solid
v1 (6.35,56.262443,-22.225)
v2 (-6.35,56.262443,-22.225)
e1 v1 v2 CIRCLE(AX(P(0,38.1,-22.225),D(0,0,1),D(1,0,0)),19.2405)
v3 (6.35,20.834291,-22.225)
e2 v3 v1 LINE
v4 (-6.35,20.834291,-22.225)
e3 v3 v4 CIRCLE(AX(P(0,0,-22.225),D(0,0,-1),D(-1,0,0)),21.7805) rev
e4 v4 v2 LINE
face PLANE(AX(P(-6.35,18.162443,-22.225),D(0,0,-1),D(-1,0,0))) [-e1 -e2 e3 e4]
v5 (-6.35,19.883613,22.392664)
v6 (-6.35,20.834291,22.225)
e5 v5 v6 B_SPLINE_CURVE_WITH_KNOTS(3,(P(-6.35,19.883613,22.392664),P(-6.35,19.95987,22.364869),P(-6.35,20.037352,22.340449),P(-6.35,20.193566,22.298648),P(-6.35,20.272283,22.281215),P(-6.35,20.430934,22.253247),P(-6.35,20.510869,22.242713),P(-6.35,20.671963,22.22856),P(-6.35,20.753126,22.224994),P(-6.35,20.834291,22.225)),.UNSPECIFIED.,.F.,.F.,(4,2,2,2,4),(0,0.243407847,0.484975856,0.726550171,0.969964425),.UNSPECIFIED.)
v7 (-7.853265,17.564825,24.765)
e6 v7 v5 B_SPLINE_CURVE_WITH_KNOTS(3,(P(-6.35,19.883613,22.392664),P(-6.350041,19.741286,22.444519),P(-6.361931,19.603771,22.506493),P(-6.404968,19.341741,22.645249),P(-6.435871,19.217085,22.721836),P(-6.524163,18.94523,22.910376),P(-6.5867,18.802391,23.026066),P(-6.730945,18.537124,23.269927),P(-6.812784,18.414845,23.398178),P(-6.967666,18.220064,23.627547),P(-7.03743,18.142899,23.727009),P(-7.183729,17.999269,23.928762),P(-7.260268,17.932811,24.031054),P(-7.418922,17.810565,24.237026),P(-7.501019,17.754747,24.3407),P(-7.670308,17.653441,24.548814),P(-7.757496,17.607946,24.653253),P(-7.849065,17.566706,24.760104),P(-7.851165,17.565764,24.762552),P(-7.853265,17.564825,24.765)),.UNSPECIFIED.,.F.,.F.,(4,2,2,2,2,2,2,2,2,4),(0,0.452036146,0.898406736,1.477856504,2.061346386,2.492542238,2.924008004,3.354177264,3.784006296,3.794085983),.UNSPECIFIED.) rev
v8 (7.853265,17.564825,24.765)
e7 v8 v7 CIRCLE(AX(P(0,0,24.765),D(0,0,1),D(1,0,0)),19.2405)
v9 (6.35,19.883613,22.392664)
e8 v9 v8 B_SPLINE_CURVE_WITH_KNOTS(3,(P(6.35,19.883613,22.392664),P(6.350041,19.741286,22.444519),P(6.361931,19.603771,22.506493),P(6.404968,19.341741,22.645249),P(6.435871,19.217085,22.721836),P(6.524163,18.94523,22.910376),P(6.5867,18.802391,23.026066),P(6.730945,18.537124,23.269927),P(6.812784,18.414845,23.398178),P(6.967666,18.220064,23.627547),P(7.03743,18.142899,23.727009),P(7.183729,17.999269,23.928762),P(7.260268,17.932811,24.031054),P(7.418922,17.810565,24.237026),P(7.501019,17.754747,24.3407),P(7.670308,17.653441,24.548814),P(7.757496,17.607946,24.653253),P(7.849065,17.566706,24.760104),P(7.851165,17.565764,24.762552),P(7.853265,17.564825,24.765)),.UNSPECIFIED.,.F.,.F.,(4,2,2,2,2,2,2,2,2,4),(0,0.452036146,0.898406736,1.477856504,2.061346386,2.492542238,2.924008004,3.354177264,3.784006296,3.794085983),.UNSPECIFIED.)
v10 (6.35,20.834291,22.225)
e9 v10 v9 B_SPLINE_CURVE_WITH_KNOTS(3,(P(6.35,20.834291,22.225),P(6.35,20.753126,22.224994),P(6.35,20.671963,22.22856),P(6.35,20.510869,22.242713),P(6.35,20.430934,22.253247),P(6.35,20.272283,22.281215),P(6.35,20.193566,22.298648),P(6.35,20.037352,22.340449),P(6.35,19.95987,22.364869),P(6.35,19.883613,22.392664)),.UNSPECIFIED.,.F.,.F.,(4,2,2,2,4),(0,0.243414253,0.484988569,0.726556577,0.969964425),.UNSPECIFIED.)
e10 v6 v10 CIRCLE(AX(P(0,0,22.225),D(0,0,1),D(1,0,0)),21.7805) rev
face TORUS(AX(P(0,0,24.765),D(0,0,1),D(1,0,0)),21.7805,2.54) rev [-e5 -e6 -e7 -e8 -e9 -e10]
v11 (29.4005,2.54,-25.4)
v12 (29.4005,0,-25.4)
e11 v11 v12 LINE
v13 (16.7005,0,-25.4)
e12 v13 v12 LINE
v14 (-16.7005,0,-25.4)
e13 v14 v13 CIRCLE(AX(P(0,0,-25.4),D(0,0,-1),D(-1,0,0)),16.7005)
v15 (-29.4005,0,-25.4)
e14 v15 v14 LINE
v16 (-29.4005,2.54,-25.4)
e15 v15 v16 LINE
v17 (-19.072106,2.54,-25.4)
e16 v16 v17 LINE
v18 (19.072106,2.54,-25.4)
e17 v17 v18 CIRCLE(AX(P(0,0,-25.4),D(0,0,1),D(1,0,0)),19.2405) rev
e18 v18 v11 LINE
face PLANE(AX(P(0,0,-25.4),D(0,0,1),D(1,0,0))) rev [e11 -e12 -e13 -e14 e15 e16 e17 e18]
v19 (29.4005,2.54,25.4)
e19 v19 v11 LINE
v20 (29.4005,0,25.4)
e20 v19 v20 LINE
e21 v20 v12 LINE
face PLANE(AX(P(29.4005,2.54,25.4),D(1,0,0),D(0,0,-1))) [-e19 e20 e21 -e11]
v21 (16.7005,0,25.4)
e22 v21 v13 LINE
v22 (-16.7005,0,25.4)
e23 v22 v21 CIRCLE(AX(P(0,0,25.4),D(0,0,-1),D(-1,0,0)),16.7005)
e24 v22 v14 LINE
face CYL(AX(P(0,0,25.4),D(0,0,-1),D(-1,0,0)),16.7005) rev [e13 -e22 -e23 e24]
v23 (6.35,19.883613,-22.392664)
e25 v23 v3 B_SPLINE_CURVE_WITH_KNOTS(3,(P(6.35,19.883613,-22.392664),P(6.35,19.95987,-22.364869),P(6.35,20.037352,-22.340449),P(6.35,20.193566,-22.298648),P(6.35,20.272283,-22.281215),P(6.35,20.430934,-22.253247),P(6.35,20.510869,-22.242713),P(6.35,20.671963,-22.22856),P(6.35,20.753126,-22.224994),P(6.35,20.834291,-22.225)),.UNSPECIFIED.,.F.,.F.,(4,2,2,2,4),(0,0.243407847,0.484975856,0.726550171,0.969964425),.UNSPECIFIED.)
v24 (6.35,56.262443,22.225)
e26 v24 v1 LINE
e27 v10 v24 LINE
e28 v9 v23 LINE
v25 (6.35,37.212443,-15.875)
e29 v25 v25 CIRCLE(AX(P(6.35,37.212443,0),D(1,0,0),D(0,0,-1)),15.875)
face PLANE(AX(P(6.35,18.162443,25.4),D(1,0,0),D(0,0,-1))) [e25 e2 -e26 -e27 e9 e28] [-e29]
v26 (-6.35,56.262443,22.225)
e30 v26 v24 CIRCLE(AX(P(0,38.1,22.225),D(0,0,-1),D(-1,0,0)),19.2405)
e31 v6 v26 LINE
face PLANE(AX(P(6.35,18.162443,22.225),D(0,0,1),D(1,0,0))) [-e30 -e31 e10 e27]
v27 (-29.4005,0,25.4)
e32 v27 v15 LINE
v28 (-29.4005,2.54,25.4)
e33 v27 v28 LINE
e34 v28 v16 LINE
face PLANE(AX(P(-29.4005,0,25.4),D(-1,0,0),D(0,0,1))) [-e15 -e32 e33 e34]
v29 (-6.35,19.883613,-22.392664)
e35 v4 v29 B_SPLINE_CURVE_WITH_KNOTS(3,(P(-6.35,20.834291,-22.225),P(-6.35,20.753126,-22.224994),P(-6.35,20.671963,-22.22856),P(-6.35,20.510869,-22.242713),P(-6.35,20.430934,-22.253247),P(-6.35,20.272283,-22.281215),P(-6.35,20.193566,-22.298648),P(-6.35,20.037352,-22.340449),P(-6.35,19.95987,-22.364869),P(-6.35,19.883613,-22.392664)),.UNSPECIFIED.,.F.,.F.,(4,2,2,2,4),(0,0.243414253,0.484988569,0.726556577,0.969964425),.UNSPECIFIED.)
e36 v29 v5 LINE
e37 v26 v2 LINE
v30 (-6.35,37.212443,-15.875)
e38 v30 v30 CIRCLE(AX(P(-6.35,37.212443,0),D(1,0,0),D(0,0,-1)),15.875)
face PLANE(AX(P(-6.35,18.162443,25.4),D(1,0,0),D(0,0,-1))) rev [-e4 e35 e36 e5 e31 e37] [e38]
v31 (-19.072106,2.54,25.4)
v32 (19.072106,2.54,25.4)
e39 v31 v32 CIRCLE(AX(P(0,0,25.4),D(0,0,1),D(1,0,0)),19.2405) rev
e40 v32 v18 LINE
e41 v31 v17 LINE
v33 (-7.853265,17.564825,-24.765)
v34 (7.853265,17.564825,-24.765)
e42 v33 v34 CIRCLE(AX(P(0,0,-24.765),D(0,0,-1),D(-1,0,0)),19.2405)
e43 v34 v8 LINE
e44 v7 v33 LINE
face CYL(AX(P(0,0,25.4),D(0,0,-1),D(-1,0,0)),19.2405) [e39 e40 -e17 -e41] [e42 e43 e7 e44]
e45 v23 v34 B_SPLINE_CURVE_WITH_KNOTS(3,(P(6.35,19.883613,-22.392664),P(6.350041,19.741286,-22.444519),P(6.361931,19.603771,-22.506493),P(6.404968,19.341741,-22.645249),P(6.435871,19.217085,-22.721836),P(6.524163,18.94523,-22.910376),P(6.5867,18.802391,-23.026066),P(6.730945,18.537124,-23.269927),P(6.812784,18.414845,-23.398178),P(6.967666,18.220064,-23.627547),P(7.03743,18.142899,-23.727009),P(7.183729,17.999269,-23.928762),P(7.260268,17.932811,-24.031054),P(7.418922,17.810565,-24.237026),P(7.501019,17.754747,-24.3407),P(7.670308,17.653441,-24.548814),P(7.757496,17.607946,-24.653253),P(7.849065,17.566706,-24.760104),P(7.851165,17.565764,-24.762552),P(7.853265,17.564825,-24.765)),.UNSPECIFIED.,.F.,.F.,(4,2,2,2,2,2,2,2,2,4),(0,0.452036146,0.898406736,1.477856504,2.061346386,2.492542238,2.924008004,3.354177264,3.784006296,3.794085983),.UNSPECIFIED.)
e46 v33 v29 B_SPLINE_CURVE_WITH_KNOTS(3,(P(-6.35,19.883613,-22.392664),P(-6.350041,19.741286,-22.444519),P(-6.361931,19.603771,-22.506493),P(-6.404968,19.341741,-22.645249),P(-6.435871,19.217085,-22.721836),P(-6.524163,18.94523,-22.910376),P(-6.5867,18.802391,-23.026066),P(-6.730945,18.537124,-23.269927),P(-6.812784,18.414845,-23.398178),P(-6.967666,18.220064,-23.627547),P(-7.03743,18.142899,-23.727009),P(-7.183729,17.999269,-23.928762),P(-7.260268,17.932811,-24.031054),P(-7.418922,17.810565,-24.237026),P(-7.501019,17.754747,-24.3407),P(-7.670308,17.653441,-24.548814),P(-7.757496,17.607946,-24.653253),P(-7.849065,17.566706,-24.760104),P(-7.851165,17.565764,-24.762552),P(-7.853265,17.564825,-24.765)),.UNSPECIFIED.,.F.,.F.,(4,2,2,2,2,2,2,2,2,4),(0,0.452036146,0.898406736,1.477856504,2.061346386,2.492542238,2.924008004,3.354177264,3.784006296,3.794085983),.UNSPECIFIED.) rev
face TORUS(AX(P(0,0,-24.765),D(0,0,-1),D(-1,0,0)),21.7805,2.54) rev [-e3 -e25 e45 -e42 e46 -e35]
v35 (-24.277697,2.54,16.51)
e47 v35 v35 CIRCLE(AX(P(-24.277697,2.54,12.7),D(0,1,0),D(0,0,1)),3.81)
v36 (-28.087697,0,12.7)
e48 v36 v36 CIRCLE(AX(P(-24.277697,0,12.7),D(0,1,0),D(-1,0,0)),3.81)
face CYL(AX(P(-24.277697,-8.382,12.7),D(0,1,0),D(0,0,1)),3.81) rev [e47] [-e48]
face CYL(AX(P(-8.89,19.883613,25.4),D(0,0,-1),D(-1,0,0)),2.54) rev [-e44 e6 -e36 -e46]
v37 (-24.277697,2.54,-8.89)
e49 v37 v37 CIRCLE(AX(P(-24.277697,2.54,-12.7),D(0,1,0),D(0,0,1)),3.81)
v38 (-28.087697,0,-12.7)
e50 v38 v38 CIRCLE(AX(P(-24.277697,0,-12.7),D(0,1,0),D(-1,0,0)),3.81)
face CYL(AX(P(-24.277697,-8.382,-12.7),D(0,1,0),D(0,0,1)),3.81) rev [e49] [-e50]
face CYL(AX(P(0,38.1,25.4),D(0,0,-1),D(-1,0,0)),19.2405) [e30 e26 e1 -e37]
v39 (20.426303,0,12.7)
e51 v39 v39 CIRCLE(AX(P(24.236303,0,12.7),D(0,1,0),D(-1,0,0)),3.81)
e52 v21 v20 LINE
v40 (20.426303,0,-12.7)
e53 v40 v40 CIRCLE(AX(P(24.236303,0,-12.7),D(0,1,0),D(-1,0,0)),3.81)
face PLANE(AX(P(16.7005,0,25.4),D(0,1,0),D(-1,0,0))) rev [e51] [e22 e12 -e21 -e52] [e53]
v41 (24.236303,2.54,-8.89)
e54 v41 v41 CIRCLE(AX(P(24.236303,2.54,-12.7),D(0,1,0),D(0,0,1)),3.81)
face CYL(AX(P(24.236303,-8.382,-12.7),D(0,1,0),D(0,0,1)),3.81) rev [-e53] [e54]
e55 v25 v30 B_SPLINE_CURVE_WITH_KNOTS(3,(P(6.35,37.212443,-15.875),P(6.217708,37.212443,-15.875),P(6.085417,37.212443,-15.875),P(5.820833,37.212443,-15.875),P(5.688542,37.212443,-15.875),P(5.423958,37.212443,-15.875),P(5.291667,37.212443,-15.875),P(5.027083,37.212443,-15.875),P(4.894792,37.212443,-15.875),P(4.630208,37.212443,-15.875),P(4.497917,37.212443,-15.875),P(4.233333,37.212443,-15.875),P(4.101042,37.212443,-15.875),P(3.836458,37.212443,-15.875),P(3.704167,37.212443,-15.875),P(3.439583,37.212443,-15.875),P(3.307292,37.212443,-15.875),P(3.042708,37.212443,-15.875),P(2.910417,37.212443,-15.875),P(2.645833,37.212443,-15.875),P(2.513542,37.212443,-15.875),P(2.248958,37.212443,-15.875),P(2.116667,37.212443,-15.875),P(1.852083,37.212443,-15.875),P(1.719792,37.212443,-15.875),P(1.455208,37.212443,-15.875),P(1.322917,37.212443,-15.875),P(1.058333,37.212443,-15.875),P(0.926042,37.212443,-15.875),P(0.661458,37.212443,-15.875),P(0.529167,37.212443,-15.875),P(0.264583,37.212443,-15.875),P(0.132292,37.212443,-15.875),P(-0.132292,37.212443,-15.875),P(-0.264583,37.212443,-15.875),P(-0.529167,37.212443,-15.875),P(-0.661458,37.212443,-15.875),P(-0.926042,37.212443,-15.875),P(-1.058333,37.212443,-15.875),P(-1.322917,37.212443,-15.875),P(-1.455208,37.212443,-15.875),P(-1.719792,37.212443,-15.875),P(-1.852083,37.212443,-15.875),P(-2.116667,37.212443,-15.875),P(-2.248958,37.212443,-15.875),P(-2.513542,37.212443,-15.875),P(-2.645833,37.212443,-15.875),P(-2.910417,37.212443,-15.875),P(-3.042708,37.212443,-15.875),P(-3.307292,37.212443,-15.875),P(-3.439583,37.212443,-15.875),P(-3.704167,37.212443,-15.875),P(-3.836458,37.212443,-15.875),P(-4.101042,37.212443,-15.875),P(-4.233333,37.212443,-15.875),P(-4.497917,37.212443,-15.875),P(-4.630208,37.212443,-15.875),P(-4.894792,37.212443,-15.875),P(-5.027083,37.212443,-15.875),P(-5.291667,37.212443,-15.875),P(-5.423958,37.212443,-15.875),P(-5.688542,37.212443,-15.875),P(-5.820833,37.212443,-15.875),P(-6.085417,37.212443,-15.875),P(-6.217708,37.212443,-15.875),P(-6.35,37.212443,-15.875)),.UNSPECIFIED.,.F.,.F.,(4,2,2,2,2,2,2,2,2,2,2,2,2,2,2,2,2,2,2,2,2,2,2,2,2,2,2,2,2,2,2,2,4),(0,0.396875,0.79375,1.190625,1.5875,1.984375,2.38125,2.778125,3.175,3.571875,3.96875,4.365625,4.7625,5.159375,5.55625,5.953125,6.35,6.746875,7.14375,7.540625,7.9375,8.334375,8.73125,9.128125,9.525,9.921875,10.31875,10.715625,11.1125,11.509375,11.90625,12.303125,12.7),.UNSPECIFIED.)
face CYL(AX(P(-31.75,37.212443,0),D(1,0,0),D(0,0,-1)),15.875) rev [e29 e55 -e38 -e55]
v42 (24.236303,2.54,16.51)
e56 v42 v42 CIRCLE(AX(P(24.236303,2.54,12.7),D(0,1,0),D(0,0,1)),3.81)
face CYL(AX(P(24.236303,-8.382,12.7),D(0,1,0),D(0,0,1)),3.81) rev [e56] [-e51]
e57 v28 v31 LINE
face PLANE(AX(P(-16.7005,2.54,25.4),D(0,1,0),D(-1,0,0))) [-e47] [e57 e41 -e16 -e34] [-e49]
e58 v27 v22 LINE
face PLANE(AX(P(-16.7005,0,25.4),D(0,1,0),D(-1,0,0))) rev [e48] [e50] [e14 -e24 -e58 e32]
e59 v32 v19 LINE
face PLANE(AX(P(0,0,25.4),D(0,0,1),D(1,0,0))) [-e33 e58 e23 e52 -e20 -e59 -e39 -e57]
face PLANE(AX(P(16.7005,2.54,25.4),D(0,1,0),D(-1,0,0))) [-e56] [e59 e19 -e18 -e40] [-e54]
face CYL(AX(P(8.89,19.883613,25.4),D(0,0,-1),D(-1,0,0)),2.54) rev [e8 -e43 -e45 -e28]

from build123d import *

# Parameters (mm, degrees)
EXTRUDE_THIN1_DEPTH = 25.4
SKETCH2_R           = 3.81
CUT_EXTRUDE1_DEPTH  = 10.922
BOSS_EXTRUDE1_START = -22.225
BOSS_EXTRUDE1_DEPTH = 44.45
SKETCH4_R           = 15.875
CUT_EXTRUDE2_DEPTH  = 38.1
FILLET1_R           = 2.54


# Read off the part's stored shape, not the designer's step: Boss-Extrude1
with BuildPart() as part:
    # Sketch1 → Extrude-Thin1 (new, symmetric)
    with BuildSketch(Plane.XY):
        with BuildLine():
            Line((29.4005, 0), (16.7005, 0))
            ThreePointArc((16.7005, 0), (0, 16.7005), (-16.7005, 0))
            Line((-16.7005, 0), (-29.4005, 0))
            Line((-29.4005, 0), (-29.4005, 2.54))
            Line((-29.4005, 2.54), (-19.07210634, 2.54))
            ThreePointArc((-19.07210634, 2.54), (0, 19.2405), (19.07210634, 2.54))
            Line((19.07210634, 2.54), (29.4005, 2.54))
            Line((29.4005, 2.54), (29.4005, 0))
        make_face()
    extrude(amount=EXTRUDE_THIN1_DEPTH, both=True)

    # Sketch2 → Cut-Extrude1 (cut)
    with BuildSketch(Plane(origin=(0, 2.54, 0), x_dir=(1, 0, 0), z_dir=(0, 1, 0))):
        with Locations(Location((24.23630317, -12.7, 0), (0, 0, 270))):
            Circle(SKETCH2_R)
        with Locations(Location((24.23630317, 12.7, 0), (0, 0, 270))):
            Circle(SKETCH2_R)
        with Locations(Location((-24.27769683, 12.7, 0), (0, 0, 270))):
            Circle(SKETCH2_R)
        with Locations(Location((-24.27769683, -12.7, 0), (0, 0, 270))):
            Circle(SKETCH2_R)
    extrude(amount=-CUT_EXTRUDE1_DEPTH, mode=Mode.SUBTRACT)

    # Boss-Extrude1 outline → Boss-Extrude1 (add)
    with BuildSketch(Plane.XY.offset(BOSS_EXTRUDE1_START)):
        with BuildLine():
            ThreePointArc((6.35, 56.262443124), (0, 57.3405), (-6.35, 56.262443124))
            Line((-6.35, 56.262443124), (-6.35, 18.162443124))
            ThreePointArc((-6.35, 18.162443124), (0, 19.2405), (6.35, 18.162443124))
            Line((6.35, 18.162443124), (6.35, 56.262443124))
        make_face()
    extrude(amount=BOSS_EXTRUDE1_DEPTH)

    # Sketch4 → Cut-Extrude2 (cut)
    with BuildSketch(Plane(origin=(6.35, 0, 0), x_dir=(0, 0, -1), z_dir=(1, 0, 0))):
        with Locations((0, 37.212443124)):
            Circle(SKETCH4_R)
    extrude(amount=-CUT_EXTRUDE2_DEPTH, mode=Mode.SUBTRACT)

    # Fillet1
    fillet1_edges = [part.edges().sort_by_distance(p)[0] for p in [
        (-6.35, 18.162443124, 0),
        (0, 19.2405, 22.225),
        (6.35, 18.162443124, 0),
        (0, 19.2405, -22.225),
    ]]
    fillet(fillet1_edges, radius=FILLET1_R)


solid = part.part
